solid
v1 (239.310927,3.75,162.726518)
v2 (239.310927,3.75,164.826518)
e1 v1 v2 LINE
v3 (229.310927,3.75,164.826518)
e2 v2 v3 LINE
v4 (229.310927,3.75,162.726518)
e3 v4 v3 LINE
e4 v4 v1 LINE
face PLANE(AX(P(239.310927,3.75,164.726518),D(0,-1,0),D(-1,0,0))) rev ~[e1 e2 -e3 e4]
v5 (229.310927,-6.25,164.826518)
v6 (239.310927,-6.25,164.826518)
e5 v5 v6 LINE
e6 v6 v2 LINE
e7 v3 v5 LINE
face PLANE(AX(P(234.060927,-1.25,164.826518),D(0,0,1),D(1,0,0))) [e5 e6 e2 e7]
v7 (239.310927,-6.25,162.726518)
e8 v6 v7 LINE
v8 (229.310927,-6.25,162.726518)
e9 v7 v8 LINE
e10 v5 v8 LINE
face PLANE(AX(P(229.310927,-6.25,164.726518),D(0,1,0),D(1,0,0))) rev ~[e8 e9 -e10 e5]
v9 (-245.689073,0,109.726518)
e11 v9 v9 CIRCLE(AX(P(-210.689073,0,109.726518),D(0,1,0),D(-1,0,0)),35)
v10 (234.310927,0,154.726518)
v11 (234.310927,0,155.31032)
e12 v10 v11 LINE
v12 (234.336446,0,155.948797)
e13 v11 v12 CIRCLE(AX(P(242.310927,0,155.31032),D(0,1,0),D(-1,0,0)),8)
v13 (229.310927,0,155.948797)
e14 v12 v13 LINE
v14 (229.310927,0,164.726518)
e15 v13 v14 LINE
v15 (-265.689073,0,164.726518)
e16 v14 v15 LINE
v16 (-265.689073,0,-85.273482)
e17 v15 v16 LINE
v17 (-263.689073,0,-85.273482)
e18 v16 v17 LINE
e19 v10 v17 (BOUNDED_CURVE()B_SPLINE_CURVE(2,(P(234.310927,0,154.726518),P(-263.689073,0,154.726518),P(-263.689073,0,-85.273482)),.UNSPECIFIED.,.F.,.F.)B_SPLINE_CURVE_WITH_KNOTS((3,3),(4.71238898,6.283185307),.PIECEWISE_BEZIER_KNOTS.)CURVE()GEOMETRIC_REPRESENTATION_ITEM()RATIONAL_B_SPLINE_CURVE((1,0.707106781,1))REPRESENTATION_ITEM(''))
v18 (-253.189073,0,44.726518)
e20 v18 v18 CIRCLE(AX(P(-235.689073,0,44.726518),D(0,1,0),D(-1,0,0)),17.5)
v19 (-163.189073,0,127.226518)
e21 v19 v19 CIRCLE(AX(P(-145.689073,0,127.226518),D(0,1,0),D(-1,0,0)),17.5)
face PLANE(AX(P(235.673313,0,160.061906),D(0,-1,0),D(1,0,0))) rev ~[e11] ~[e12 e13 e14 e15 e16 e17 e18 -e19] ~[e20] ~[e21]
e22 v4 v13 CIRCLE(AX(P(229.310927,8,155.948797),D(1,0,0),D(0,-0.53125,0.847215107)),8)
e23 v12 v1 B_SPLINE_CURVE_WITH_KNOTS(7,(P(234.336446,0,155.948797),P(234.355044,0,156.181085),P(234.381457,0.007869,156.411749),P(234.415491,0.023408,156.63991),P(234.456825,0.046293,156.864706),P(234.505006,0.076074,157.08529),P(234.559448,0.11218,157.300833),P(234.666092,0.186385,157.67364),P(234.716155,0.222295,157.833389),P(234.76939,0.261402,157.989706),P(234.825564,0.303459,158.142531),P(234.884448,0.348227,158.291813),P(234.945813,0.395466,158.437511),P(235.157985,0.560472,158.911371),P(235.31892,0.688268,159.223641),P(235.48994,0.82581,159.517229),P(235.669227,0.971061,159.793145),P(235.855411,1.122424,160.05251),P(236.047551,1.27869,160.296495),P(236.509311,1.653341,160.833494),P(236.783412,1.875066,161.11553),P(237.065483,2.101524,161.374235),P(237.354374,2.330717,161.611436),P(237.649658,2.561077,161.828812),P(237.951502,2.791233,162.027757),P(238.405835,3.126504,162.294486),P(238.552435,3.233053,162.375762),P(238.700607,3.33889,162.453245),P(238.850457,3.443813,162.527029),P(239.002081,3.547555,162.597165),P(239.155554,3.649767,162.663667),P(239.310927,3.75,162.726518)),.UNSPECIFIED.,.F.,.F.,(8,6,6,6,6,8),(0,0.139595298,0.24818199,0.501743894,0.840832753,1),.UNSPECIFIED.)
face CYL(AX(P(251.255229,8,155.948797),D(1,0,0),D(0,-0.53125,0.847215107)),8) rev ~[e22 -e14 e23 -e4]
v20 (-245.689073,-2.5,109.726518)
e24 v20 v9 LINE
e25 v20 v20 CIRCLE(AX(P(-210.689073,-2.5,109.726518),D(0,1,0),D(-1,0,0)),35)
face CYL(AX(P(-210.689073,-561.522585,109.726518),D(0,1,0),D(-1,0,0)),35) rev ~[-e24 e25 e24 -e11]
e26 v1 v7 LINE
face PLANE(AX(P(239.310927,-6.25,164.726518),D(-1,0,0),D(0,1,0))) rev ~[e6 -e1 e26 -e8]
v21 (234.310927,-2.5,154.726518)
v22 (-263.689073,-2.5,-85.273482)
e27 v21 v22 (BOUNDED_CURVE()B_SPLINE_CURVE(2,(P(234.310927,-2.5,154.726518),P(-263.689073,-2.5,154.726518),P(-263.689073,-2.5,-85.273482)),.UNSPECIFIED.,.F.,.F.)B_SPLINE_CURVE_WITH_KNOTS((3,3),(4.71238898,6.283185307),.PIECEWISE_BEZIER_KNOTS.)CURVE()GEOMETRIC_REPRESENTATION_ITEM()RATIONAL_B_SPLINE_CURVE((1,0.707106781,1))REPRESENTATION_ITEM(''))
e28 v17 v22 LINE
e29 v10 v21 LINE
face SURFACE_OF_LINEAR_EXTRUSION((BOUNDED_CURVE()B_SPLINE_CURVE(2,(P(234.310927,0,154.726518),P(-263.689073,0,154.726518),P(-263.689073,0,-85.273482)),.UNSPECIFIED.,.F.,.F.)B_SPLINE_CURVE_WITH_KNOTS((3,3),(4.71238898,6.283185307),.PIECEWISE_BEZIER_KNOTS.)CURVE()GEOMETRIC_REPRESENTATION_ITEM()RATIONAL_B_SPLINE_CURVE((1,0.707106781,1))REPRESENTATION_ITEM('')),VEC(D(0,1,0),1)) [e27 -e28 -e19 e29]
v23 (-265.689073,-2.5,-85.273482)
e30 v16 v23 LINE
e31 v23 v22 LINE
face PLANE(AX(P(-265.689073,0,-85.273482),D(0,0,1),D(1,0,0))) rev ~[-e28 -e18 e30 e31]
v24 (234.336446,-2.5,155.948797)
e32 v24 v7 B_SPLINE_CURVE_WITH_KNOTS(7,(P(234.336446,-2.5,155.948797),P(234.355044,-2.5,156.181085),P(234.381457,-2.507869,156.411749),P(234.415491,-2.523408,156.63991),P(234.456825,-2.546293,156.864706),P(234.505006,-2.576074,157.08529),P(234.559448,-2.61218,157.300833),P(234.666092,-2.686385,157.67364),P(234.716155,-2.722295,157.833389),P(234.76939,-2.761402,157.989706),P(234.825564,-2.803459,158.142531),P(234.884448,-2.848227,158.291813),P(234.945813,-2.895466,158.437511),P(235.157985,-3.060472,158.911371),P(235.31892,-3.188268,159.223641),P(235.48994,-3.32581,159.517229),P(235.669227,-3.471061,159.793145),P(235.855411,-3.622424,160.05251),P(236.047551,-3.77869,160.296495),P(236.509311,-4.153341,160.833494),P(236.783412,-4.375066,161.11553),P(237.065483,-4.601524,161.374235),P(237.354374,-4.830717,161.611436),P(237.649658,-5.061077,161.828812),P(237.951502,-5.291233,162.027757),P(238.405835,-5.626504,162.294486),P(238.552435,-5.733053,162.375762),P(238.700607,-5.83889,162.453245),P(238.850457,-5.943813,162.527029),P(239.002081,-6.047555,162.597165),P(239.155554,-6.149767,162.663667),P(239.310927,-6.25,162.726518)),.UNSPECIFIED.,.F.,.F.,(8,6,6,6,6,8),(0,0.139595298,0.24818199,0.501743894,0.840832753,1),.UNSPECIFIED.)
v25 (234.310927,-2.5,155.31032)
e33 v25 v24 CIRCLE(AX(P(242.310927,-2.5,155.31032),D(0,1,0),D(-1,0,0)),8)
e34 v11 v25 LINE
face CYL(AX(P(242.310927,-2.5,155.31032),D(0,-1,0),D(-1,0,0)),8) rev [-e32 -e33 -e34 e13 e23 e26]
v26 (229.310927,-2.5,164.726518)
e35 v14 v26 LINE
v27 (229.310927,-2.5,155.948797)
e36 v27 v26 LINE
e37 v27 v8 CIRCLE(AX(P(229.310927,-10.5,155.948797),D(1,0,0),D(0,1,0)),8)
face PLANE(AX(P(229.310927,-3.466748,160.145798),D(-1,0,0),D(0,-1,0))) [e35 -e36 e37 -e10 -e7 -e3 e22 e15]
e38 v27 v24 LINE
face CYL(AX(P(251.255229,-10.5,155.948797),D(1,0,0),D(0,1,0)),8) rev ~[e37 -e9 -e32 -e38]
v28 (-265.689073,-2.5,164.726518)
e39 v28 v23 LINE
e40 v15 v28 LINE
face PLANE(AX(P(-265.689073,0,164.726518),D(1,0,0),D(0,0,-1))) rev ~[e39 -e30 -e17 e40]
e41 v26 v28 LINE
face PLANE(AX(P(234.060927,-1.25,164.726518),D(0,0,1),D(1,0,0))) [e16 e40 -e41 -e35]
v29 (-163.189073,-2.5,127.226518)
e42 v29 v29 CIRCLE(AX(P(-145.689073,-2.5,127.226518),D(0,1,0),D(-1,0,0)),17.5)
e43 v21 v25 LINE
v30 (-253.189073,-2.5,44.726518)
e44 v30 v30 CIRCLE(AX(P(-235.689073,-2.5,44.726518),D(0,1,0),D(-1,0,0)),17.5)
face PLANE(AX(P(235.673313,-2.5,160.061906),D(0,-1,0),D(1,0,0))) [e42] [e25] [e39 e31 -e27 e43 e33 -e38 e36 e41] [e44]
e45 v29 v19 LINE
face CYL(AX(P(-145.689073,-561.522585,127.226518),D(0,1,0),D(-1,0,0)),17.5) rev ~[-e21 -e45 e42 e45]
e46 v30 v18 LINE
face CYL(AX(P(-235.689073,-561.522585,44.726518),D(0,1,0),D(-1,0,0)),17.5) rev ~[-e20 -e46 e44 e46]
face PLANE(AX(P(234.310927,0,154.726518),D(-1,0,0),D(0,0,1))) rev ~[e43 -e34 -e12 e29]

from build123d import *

# Parameters (mm, degrees)
F1_DEPTH     = 2.5
F3_D         = 70
F4_D         = 35
F5_W         = 5
F5_H         = 2.5
F6_DEPTH     = 2
F7_DEPTH     = 0.1
F8_T1_DEPTH  = 2.5
F8_T3_DEPTH  = 5
F8_T9_DEPTH  = 21.0404962177
F8_T14_DEPTH = 21.9443021397
F8_T22_DEPTH = 21.0404962177
F8_T27_DEPTH = 21.9443021397


# Not quite as in the source:
# - a fillet or chamfer that OpenCascade refuses, or shapes differently, is made with other operations: its cross-section is extruded or revolved along the edge and cut away or added


with BuildPart() as f1:
    # F0 (on Front) → F1 (new body)
    with BuildSketch(Plane.XZ):
        with BuildLine():
            Line((234.3109268695, 164.7265180945), (-265.6890731305, 164.7265180945))
            Line((-265.6890731305, 164.7265180945), (-265.6890731305, -85.2734819055))
            Line((-265.6890731305, -85.2734819055), (-263.6890731305, -85.2734819055))
            add(Edge.make_bspline(
                [(234.3109268695, 154.7265180945), (-263.6890731305, 154.7265180945), (-263.6890731305, -85.2734819055)],
                knots=[4.7123889804, 4.7123889804, 4.7123889804, 6.2831853072, 6.2831853072, 6.2831853072], degree=2, weights=[1, 0.7071067812, 1]))
            Line((234.3109268695, 154.7265180945), (234.3109268695, 164.7265180945))
        make_face()
    extrude(amount=F1_DEPTH)

    # F3 (through all)
    with Locations(Plane.XZ.offset(2.5)):
        with Locations((-210.6890731305, 109.7265180945)):
            Hole(F3_D / 2)

    # F4 (through all)
    with Locations(Plane.XZ.offset(2.5)):
        with Locations((-145.6890731305, 127.2265180945), (-235.6890731305, 44.7265180945)):
            Hole(F4_D / 2)

    # F5 (on face) → F6 (join)
    with BuildSketch(Plane.XY.offset(164.7265180945)):
        Polygon((239.3109268695, -6.25), (239.3109268695, 3.75), (229.3109268695, 3.75), (229.3109268695, 0), (234.3109268695, 0), (234.3109268695, -2.5), (229.3109268695, -2.5), (229.3109268695, -6.25), align=None)
        with Locations((231.8109268695, -1.25)):
            Rectangle(F5_W, F5_H)
    extrude(amount=-F6_DEPTH)

    # F5 (on face) → F7 (join)
    with BuildSketch(Plane.XY.offset(164.7265180945)):
        Polygon((239.3109268695, -6.25), (239.3109268695, 3.75), (229.3109268695, 3.75), (229.3109268695, 0), (234.3109268695, 0), (234.3109268695, -2.5), (229.3109268695, -2.5), (229.3109268695, -6.25), align=None)
        with Locations((231.8109268695, -1.25)):
            Rectangle(F5_W, F5_H)
    extrude(amount=F7_DEPTH)

    # F8: fillet of radius 8 on 3 edges, made by hand

    # F8_s2 → F8_t1 (join)
    with BuildSketch(Plane.XZ):
        with BuildLine():
            ThreePointArc((234.3109268695, 155.3103196074), (235.6776772888, 159.7824555624), (239.3109268695, 162.7265180945))
            Line((239.3109268695, 162.7265180945), (234.3109268695, 162.7265180945))
            Line((234.3109268695, 162.7265180945), (234.3109268695, 155.3103196074))
        make_face()
    extrude(amount=F8_T1_DEPTH)

    # F8_s4 → F8_t3 (join)
    with BuildSketch(Plane.YZ.offset(229.3109268695)):
        with BuildLine():
            ThreePointArc((-2.5, 155.9487972387), (-3.5, 159.8217805849), (-6.25, 162.7265180945))
            Line((-6.25, 162.7265180945), (-2.5, 162.7265180945))
            Line((-2.5, 162.7265180945), (-2.5, 155.9487972387))
        make_face()
        with BuildLine():
            ThreePointArc((3.75, 162.7265180945), (1, 159.8217805849), (0, 155.9487972387))
            Line((0, 155.9487972387), (0, 162.7265180945))
            Line((0, 162.7265180945), (3.75, 162.7265180945))
        make_face()
    extrude(amount=F8_T3_DEPTH)


with BuildPart() as f8_tool7:
    # F8_s8 → F8_t9 (new body)
    with BuildSketch(Plane.XZ.offset(21.0404962177)):
        with BuildLine():
            ThreePointArc((234.3109268695, 155.3103196074), (235.6776772888, 159.7824555624), (239.3109268695, 162.7265180945))
            Line((239.3109268695, 162.7265180945), (234.3109268695, 162.7265180945))
            Line((234.3109268695, 162.7265180945), (234.3109268695, 155.3103196074))
        make_face()
    extrude(amount=-F8_T9_DEPTH)

    split(bisect_by=Plane.XZ.offset(6.25), keep=Keep.BOTTOM)

    split(bisect_by=Plane.XZ.offset(2.5), keep=Keep.TOP)


with BuildPart() as f8_tool12:
    # F8_s13 → F8_t14 (new body)
    with BuildSketch(Plane.YZ.offset(251.2552290092)):
        with BuildLine():
            ThreePointArc((-2.5, 155.9487972387), (-3.5, 159.8217805849), (-6.25, 162.7265180945))
            Line((-6.25, 162.7265180945), (-2.5, 162.7265180945))
            Line((-2.5, 162.7265180945), (-2.5, 155.9487972387))
        make_face()
    extrude(amount=-F8_T14_DEPTH)

    split(bisect_by=Plane.YZ.offset(234.3109268695), keep=Keep.TOP)

    split(bisect_by=Plane.YZ.offset(239.3109268695), keep=Keep.BOTTOM)


with BuildPart() as f8_tool7_1:
    add(f8_tool7.part)

    # F8_t17: intersect F8_tool12
    add(f8_tool12.part, mode=Mode.INTERSECT)


with BuildPart() as f1_1:
    add(f1.part)

    # F8_t5: union F8_tool7
    add(f8_tool7_1.part)


with BuildPart() as f8_tool20:
    # F8_s21 → F8_t22 (new body)
    with BuildSketch(Plane.XZ.offset(2.5)):
        with BuildLine():
            ThreePointArc((234.3109268695, 155.3103196074), (235.6776772888, 159.7824555624), (239.3109268695, 162.7265180945))
            Line((239.3109268695, 162.7265180945), (234.3109268695, 162.7265180945))
            Line((234.3109268695, 162.7265180945), (234.3109268695, 155.3103196074))
        make_face()
    extrude(amount=-F8_T22_DEPTH)

    split(bisect_by=Plane.XZ.offset(-3.75), keep=Keep.TOP)

    split(bisect_by=Plane.XZ, keep=Keep.BOTTOM)


with BuildPart() as f8_tool25:
    # F8_s26 → F8_t27 (new body)
    with BuildSketch(Plane.YZ.offset(251.2552290092)):
        with BuildLine():
            ThreePointArc((3.75, 162.7265180945), (1, 159.8217805849), (0, 155.9487972387))
            Line((0, 155.9487972387), (0, 162.7265180945))
            Line((0, 162.7265180945), (3.75, 162.7265180945))
        make_face()
    extrude(amount=-F8_T27_DEPTH)

    split(bisect_by=Plane.YZ.offset(234.3109268695), keep=Keep.TOP)

    split(bisect_by=Plane.YZ.offset(239.3109268695), keep=Keep.BOTTOM)


with BuildPart() as f8_tool20_1:
    add(f8_tool20.part)

    # F8_t30: intersect F8_tool25
    add(f8_tool25.part, mode=Mode.INTERSECT)


with BuildPart() as f1_2:
    add(f1_1.part)

    # F8_t18: union F8_tool20
    add(f8_tool20_1.part)


solid = f1_2.part
